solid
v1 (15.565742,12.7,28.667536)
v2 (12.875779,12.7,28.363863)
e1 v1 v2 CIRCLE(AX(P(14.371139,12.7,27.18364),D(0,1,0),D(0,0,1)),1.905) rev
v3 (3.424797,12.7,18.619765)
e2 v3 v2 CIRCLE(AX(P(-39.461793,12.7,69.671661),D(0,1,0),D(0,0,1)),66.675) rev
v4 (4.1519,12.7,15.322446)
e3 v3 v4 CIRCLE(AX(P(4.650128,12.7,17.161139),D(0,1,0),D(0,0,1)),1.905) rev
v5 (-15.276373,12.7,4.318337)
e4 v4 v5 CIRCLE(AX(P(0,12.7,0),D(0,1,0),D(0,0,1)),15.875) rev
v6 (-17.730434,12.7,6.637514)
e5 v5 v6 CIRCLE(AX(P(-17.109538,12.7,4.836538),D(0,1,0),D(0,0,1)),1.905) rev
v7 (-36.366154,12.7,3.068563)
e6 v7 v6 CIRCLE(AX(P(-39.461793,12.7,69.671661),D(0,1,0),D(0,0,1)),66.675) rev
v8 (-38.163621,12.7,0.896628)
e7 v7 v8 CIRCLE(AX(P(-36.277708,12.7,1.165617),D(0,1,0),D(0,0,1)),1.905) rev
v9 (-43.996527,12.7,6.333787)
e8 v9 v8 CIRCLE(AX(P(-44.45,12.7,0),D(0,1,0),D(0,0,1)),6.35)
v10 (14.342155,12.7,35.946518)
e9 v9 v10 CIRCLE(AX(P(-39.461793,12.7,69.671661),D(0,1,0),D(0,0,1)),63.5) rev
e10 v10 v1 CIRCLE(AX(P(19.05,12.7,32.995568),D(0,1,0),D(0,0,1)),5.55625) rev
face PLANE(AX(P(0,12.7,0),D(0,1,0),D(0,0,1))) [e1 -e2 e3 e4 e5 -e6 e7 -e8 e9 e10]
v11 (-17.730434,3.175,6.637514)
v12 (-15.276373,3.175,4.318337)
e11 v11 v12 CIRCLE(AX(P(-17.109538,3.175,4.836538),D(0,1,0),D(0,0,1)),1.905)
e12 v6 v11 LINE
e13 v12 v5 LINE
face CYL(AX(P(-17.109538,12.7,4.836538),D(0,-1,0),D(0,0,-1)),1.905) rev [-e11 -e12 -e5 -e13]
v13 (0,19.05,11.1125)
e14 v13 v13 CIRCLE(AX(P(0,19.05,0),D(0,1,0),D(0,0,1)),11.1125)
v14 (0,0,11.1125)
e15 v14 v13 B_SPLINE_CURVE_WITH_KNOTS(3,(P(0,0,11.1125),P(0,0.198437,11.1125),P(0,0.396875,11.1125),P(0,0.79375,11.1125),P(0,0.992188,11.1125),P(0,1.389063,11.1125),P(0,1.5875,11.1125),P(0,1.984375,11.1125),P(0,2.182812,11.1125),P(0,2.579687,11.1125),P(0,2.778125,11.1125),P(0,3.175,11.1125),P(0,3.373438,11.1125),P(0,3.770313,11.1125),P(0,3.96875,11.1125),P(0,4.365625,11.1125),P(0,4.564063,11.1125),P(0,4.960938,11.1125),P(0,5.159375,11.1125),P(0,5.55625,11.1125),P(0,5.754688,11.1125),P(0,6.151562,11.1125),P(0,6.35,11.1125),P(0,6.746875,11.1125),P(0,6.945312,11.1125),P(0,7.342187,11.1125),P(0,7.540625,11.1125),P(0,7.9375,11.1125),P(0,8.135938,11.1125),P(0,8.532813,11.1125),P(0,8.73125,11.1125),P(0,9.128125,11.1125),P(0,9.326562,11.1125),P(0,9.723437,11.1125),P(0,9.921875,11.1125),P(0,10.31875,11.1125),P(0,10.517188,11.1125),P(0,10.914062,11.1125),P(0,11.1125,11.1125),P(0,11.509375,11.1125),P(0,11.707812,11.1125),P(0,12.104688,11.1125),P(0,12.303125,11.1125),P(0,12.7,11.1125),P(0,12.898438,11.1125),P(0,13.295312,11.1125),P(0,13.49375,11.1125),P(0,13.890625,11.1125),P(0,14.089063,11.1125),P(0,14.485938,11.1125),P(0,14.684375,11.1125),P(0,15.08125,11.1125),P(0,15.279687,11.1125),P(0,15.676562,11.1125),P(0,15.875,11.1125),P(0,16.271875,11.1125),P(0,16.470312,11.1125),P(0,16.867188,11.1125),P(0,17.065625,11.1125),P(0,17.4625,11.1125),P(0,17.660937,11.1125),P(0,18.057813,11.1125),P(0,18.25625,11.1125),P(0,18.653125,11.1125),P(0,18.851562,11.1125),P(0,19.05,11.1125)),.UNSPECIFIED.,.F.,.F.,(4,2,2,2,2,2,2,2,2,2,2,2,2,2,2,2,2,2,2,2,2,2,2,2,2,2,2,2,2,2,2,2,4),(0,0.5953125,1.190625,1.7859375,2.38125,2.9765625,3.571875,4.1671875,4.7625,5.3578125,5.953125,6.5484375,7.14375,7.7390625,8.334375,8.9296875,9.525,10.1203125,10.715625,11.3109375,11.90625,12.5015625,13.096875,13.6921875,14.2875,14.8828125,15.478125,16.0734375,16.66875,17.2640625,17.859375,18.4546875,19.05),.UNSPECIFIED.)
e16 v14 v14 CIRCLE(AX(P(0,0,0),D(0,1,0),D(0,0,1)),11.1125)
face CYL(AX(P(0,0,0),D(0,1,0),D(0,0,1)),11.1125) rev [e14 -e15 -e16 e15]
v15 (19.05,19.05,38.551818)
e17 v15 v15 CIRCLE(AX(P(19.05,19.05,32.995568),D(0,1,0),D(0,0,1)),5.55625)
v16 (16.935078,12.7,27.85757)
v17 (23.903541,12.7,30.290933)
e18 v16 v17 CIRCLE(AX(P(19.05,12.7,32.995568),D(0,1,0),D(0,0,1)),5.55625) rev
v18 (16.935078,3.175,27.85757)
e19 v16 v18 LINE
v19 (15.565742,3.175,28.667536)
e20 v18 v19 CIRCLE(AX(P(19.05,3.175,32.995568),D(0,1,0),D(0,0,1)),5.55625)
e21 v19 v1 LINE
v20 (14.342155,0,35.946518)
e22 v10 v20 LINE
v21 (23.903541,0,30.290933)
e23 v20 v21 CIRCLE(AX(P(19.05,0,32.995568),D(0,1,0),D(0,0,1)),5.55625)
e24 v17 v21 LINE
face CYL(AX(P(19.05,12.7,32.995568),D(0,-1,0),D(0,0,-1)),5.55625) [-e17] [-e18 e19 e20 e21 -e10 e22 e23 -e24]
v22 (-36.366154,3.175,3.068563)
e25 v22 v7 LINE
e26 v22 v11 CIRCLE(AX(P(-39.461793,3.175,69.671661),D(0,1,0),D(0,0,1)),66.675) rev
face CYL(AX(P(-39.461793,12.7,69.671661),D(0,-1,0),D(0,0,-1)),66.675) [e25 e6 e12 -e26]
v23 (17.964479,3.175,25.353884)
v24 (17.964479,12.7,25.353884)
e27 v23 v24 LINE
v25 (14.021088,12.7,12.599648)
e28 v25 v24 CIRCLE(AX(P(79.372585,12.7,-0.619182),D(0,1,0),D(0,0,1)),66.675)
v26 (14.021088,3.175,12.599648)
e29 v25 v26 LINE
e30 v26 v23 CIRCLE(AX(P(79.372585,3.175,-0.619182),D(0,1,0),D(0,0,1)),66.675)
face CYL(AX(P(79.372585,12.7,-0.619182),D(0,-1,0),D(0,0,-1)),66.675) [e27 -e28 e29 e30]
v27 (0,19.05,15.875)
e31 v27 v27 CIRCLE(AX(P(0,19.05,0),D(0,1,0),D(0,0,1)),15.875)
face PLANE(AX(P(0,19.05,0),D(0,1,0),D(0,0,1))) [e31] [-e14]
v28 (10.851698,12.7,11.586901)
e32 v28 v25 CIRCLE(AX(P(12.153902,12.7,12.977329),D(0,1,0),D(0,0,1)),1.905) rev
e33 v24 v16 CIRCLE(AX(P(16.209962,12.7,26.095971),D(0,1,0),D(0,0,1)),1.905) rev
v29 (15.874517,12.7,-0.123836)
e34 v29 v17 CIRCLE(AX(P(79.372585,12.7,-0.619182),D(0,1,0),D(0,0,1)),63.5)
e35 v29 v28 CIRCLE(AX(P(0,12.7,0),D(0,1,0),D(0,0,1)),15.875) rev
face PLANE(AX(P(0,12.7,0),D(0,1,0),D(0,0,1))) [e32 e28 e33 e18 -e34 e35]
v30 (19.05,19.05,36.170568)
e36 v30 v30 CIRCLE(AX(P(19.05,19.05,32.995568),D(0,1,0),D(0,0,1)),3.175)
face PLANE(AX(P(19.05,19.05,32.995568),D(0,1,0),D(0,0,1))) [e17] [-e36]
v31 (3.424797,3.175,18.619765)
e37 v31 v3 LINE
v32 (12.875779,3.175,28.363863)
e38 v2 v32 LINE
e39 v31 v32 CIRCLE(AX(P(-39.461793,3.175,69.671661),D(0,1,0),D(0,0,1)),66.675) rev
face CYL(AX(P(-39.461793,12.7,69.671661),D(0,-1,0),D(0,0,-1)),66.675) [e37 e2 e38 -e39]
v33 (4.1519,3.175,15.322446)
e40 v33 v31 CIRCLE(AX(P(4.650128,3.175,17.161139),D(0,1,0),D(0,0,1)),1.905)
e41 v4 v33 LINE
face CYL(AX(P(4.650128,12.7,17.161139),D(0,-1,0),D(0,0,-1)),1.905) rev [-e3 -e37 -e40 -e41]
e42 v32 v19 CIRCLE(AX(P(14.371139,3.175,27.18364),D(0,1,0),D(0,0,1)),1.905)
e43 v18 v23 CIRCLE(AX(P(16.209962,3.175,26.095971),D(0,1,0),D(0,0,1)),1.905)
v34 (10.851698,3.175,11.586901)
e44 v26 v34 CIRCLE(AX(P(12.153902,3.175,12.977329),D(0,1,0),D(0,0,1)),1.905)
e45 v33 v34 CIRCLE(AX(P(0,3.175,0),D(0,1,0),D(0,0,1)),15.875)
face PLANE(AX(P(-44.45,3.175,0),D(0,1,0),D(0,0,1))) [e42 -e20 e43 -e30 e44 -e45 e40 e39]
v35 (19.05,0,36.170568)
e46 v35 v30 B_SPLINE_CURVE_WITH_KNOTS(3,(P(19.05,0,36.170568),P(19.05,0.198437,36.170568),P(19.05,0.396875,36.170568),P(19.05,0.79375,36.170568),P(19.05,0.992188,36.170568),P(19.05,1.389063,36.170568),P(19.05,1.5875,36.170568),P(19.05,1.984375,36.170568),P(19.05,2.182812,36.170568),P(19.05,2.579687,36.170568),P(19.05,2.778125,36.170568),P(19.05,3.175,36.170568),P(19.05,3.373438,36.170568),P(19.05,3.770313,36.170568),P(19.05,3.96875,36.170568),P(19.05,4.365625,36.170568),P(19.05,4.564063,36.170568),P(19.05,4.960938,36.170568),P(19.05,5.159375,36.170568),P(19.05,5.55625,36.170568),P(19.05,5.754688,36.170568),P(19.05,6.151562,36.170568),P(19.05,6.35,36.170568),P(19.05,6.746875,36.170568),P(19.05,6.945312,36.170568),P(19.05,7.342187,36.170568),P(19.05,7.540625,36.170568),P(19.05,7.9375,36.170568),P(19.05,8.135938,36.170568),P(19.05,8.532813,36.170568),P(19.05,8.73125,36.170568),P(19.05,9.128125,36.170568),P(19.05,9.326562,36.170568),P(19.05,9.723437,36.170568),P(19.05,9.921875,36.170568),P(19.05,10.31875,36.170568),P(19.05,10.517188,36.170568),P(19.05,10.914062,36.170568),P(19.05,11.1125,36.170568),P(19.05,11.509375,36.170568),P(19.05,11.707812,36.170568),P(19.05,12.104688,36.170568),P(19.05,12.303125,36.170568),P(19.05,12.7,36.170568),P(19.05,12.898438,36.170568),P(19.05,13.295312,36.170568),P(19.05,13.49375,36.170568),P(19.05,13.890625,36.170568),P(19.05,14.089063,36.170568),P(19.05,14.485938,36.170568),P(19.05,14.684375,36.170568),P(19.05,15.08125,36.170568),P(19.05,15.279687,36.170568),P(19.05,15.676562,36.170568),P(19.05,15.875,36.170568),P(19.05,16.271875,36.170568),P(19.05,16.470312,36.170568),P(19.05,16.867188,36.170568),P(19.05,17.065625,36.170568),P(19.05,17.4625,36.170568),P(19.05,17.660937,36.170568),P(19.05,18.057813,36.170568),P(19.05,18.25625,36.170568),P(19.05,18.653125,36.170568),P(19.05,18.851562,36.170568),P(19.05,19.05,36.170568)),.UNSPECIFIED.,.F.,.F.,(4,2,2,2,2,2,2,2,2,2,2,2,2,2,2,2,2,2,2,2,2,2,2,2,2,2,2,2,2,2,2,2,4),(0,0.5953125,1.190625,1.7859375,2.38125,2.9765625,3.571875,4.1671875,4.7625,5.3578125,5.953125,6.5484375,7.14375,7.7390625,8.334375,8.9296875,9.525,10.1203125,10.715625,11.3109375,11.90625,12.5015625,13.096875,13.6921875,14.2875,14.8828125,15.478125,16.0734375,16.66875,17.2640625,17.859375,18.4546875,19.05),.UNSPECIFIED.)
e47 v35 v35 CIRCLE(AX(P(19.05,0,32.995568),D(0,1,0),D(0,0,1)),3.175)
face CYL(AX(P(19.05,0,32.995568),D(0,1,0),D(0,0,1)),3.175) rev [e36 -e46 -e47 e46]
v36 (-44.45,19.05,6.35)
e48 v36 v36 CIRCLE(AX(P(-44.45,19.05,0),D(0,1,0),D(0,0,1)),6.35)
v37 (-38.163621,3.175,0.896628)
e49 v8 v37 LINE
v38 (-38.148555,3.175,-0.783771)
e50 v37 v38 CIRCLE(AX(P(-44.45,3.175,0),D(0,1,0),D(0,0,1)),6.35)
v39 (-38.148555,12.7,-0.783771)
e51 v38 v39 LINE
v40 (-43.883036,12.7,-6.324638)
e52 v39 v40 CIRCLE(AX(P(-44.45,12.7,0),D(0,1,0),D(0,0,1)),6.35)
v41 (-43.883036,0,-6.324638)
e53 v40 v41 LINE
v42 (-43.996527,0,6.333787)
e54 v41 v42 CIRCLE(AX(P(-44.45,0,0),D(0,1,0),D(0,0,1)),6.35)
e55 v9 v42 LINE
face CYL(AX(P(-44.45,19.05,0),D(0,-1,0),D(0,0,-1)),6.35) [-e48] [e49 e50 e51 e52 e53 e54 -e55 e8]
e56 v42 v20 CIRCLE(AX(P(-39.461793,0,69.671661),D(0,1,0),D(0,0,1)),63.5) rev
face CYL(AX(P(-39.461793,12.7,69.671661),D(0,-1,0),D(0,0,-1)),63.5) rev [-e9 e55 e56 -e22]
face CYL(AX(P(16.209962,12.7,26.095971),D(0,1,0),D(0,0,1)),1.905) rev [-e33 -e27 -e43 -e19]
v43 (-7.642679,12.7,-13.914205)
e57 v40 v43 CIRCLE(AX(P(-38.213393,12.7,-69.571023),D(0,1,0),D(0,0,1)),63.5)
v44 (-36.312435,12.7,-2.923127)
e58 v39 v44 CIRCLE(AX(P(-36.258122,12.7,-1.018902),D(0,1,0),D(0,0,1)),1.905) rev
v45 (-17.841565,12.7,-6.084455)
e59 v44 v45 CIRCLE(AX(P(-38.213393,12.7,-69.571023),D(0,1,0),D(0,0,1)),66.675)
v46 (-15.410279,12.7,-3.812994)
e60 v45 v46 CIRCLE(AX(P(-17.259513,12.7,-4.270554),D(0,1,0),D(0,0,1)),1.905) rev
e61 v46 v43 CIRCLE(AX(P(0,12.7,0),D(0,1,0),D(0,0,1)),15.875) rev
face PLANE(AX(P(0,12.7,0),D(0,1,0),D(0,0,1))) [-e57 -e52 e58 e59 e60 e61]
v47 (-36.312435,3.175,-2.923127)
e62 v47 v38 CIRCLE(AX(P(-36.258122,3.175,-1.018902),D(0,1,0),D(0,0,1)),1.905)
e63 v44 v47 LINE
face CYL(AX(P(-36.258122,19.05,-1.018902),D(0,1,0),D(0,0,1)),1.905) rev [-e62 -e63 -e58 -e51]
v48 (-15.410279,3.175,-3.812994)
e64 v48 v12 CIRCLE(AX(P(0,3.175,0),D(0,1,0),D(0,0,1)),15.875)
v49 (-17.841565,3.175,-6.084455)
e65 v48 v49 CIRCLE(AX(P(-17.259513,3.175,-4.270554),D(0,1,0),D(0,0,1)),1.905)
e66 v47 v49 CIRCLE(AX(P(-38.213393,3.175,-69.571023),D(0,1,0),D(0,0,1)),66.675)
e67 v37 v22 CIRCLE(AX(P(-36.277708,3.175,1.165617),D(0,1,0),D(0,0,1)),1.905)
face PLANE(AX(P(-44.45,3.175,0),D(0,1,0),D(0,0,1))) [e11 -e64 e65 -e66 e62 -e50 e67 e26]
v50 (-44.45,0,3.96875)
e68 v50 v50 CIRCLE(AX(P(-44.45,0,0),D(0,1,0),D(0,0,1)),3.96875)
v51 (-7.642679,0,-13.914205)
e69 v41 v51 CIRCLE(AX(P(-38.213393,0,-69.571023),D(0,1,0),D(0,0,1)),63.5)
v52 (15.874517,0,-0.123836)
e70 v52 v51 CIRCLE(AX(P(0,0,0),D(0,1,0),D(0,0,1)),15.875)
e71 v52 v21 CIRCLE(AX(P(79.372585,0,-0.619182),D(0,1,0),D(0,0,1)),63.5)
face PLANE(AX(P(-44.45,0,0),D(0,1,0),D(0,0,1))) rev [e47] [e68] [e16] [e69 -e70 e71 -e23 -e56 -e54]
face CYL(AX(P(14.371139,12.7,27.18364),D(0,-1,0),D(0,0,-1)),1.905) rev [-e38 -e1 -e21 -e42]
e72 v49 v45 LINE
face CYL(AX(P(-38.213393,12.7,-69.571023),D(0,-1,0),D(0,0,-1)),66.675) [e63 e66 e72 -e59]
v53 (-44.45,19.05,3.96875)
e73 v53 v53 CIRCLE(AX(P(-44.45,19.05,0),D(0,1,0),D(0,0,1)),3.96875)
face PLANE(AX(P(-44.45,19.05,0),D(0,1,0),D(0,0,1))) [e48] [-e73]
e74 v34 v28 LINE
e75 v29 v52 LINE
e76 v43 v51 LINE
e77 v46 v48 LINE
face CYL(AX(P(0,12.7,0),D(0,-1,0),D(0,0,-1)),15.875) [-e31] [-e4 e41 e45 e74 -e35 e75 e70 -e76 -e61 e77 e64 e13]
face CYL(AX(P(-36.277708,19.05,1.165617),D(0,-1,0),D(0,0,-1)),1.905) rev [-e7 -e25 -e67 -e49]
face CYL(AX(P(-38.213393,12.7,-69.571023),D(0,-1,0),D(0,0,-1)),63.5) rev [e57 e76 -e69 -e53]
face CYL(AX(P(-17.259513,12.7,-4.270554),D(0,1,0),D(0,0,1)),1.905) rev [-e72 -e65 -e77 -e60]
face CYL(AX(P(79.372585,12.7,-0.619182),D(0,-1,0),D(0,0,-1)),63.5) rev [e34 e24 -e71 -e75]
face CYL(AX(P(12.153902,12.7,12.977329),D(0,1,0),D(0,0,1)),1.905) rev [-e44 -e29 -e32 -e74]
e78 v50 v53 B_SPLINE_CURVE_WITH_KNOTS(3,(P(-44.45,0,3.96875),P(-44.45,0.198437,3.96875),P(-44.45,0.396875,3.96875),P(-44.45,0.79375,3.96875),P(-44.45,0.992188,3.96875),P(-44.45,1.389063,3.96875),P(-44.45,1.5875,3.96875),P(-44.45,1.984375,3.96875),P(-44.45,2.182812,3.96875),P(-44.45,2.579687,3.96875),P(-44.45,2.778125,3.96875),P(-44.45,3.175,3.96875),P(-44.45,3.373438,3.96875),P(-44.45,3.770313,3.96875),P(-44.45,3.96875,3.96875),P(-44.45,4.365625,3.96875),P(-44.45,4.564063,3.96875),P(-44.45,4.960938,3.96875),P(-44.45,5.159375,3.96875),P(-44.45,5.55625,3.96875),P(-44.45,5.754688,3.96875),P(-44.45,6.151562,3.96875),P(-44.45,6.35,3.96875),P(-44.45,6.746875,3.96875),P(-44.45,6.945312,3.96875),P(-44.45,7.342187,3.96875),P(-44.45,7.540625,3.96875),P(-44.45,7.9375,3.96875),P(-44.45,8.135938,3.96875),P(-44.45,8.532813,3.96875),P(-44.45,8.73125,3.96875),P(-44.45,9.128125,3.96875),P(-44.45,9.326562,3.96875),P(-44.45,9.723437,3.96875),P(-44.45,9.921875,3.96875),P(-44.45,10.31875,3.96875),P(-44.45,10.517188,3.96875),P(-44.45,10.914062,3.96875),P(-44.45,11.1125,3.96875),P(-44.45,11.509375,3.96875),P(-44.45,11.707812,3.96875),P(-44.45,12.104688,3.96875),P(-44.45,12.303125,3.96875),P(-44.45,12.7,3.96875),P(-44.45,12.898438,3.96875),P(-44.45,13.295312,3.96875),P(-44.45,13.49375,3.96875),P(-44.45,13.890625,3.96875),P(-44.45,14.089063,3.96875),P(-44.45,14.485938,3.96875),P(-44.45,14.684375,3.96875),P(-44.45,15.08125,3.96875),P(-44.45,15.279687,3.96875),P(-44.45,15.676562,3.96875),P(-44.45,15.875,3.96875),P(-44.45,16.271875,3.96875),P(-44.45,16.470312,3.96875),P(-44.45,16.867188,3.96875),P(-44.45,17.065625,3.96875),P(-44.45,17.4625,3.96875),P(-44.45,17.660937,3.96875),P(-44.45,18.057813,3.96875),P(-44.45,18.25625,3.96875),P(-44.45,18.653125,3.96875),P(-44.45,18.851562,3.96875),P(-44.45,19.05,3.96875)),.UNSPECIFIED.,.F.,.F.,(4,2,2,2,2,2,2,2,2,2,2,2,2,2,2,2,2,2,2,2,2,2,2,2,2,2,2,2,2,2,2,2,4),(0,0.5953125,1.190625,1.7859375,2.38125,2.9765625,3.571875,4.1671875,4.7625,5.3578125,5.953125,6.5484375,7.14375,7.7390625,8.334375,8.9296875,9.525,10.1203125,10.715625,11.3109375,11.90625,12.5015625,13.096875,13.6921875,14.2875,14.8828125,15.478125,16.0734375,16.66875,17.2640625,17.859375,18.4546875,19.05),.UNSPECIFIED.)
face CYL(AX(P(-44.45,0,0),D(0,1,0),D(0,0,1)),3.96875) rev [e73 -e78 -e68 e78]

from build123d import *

# Parameters (mm, degrees)
SKETCH8_R             = 6.35
BOSS_EXTRUDE7_DEPTH   = 19.05
SKETCH8_R_2           = 15.875
BOSS_EXTRUDE7_2_DEPTH = 19.05
SKETCH8_R_3           = 5.55625
BOSS_EXTRUDE7_3_DEPTH = 19.05
BOSS_EXTRUDE8_DEPTH   = 12.7
SKETCH9_R             = 3.175
SKETCH9_R_2           = 12.7
SKETCH9_R_3           = 2.38125
CUT_EXTRUDE3_DEPTH    = 67.556631241
SHELL3_START          = 3.175
SHELL3_DEPTH          = 9.525
SKETCH11_R            = 15.875
BOSS_EXTRUDE9_DEPTH   = 19.05
SKETCH12_R            = 3.96875
SKETCH12_R_2          = 11.1125
SKETCH12_R_3          = 3.175
CUT_EXTRUDE4_DEPTH    = 67.556631241
FILLET1_R             = 1.905


# Read off the part's stored shape, not the designer's step: Shell3
with BuildPart() as part:
    # Sketch8 → Boss-Extrude7 (new body)
    with BuildSketch(Plane(origin=(0, 0, 0), x_dir=(1, 0, 0), z_dir=(0, 1, 0))):
        with Locations(Location((-44.45, 0, 0), (0, 0, 90))):
            Circle(SKETCH8_R)
    extrude(amount=BOSS_EXTRUDE7_DEPTH)



with BuildPart() as body_2:
    # Sketch8 → Boss-Extrude7 2 (new body)
    with BuildSketch(Plane(origin=(0, 0, 0), x_dir=(1, 0, 0), z_dir=(0, 1, 0))):
        with Locations(Location((0, 0, 0), (0, 0, 90))):
            Circle(SKETCH8_R_2)
    extrude(amount=BOSS_EXTRUDE7_2_DEPTH)


with BuildPart() as body_3:
    # Sketch8 → Boss-Extrude7 3 (new body)
    with BuildSketch(Plane(origin=(0, 0, 0), x_dir=(1, 0, 0), z_dir=(0, 1, 0))):
        with Locations(Location((19.05, -32.995567884, 0), (0, 0, 90))):
            Circle(SKETCH8_R_3)
    extrude(amount=BOSS_EXTRUDE7_3_DEPTH)


with BuildPart() as part_1:
    add(part.part)

    add(body_2.part)  # Boss-Extrude8 merges body 2

    add(body_3.part)  # Boss-Extrude8 merges body 3
    # Sketch1 → Boss-Extrude8 (add)
    with BuildSketch(Plane(origin=(0, 0, 0), x_dir=(1, 0, 0), z_dir=(0, 1, 0))):
        with BuildLine():
            ThreePointArc((15.874516986, 0.123836405), (15.874879246, 0.061918673), (15.875, 0))
            ThreePointArc((15.875, 0), (-8.083566746, -13.662780598), (-7.642678571, 13.914204586))
            ThreePointArc((-7.642678571, 13.914204586), (-25.197394313, 7.419323178), (-43.883035714, 6.324638448))
            ThreePointArc((-43.883035714, 6.324638448), (-39.763704917, 4.284989894), (-38.1, 0))
            ThreePointArc((-38.1, 0), (-39.80230939, -4.326831634), (-43.996526612, -6.333787326))
            ThreePointArc((-43.996526612, -6.333787326), (-10.719971263, -13.048717363), (14.342154608, -35.946517871))
            ThreePointArc((14.342154608, -35.946517871), (16.221269303, -28.213288437), (23.903541316, -30.290932834))
            ThreePointArc((23.903541316, -30.290932834), (17.975858999, -15.588595272), (15.874516986, 0.123836405))
        make_face()
    extrude(amount=BOSS_EXTRUDE8_DEPTH)

    # Sketch9 → Cut-Extrude3 (cut, through all)
    with BuildSketch(Plane(origin=(0, 19.05, 0), x_dir=(1, 0, 0), z_dir=(0, 1, 0))):
        with Locations(Location((-44.45, 0, 0), (0, 0, 270))):
            Circle(SKETCH9_R)
        with Locations(Location((0, 0, 0), (0, 0, 270))):
            Circle(SKETCH9_R_2)
        with Locations(Location((19.05, -32.995567884, 0), (0, 0, 270))):
            Circle(SKETCH9_R_3)
    extrude(amount=-CUT_EXTRUDE3_DEPTH, mode=Mode.SUBTRACT)

    # Shell3 outline → Shell3 (cut)
    with BuildSketch(Plane(origin=(0, 0, 0), x_dir=(1, 0, 0), z_dir=(0, 1, 0)).offset(SHELL3_START)):
        with BuildLine():
            ThreePointArc((-38.800169089, 2.898604954), (-38.1002552, -0.05692953), (-38.853048837, -2.999439561))
            ThreePointArc((-38.853048837, -2.999439561), (-25.959917491, -4.378054539), (-13.577434664, -8.226110438))
            ThreePointArc((-13.577434664, -8.226110438), (-15.868541202, -0.452796995), (-14.024412997, 7.438512289))
            ThreePointArc((-14.024412997, 7.438512289), (-26.19595995, 3.987969239), (-38.800169089, 2.898604954))
        make_face()
        with BuildLine():
            ThreePointArc((13.339048882, -8.607287606), (7.563042072, -13.957650935), (-0.073256974, -15.874830973))
            ThreePointArc((-0.073256974, -15.874830973), (7.639502671, -22.480309716), (14.259701701, -30.180437999))
            ThreePointArc((14.259701701, -30.180437999), (16.221269303, -28.213288437), (18.889968849, -27.441622971))
            ThreePointArc((18.889968849, -27.441622971), (15.417387842, -18.229913189), (13.339048882, -8.607287606))
        make_face()
    extrude(amount=SHELL3_DEPTH, mode=Mode.SUBTRACT)

    # Sketch11 → Boss-Extrude9 (add)
    with BuildSketch(Plane(origin=(0, 0, 0), x_dir=(1, 0, 0), z_dir=(0, 1, 0))):
        with Locations(Location((0, 0, 0), (0, 0, 118.778745897))):
            Circle(SKETCH11_R)
    extrude(amount=BOSS_EXTRUDE9_DEPTH)

    # Sketch12 → Cut-Extrude4 (cut, through all)
    with BuildSketch(Plane(origin=(0, 19.05, 0), x_dir=(1, 0, 0), z_dir=(0, 1, 0))):
        with Locations(Location((-44.45, 0, 0), (0, 0, 270))):
            Circle(SKETCH12_R)
        with Locations(Location((0, 0, 0), (0, 0, 270))):
            Circle(SKETCH12_R_2)
        with Locations(Location((19.05, -32.995567884, 0), (0, 0, 270))):
            Circle(SKETCH12_R_3)
    extrude(amount=-CUT_EXTRUDE4_DEPTH, mode=Mode.SUBTRACT)

    # Fillet1
    fillet1_edges = [part_1.edges().sort_by_distance(p)[0] for p in [
        (18.889968849, 7.9375, 27.441622971),
        (14.259701701, 7.9375, 30.180437999),
        (-0.073256974, 7.9375, 15.874830973),
        (13.339048882, 7.9375, 8.607287606),
        (-14.024412997, 7.9375, -7.438512289),
        (-13.577434664, 7.9375, 8.226110438),
        (-38.800169089, 7.9375, -2.898604954),
        (-38.853048837, 7.9375, 2.999439561),
    ]]
    fillet(fillet1_edges, radius=FILLET1_R)


solid = part_1.part
